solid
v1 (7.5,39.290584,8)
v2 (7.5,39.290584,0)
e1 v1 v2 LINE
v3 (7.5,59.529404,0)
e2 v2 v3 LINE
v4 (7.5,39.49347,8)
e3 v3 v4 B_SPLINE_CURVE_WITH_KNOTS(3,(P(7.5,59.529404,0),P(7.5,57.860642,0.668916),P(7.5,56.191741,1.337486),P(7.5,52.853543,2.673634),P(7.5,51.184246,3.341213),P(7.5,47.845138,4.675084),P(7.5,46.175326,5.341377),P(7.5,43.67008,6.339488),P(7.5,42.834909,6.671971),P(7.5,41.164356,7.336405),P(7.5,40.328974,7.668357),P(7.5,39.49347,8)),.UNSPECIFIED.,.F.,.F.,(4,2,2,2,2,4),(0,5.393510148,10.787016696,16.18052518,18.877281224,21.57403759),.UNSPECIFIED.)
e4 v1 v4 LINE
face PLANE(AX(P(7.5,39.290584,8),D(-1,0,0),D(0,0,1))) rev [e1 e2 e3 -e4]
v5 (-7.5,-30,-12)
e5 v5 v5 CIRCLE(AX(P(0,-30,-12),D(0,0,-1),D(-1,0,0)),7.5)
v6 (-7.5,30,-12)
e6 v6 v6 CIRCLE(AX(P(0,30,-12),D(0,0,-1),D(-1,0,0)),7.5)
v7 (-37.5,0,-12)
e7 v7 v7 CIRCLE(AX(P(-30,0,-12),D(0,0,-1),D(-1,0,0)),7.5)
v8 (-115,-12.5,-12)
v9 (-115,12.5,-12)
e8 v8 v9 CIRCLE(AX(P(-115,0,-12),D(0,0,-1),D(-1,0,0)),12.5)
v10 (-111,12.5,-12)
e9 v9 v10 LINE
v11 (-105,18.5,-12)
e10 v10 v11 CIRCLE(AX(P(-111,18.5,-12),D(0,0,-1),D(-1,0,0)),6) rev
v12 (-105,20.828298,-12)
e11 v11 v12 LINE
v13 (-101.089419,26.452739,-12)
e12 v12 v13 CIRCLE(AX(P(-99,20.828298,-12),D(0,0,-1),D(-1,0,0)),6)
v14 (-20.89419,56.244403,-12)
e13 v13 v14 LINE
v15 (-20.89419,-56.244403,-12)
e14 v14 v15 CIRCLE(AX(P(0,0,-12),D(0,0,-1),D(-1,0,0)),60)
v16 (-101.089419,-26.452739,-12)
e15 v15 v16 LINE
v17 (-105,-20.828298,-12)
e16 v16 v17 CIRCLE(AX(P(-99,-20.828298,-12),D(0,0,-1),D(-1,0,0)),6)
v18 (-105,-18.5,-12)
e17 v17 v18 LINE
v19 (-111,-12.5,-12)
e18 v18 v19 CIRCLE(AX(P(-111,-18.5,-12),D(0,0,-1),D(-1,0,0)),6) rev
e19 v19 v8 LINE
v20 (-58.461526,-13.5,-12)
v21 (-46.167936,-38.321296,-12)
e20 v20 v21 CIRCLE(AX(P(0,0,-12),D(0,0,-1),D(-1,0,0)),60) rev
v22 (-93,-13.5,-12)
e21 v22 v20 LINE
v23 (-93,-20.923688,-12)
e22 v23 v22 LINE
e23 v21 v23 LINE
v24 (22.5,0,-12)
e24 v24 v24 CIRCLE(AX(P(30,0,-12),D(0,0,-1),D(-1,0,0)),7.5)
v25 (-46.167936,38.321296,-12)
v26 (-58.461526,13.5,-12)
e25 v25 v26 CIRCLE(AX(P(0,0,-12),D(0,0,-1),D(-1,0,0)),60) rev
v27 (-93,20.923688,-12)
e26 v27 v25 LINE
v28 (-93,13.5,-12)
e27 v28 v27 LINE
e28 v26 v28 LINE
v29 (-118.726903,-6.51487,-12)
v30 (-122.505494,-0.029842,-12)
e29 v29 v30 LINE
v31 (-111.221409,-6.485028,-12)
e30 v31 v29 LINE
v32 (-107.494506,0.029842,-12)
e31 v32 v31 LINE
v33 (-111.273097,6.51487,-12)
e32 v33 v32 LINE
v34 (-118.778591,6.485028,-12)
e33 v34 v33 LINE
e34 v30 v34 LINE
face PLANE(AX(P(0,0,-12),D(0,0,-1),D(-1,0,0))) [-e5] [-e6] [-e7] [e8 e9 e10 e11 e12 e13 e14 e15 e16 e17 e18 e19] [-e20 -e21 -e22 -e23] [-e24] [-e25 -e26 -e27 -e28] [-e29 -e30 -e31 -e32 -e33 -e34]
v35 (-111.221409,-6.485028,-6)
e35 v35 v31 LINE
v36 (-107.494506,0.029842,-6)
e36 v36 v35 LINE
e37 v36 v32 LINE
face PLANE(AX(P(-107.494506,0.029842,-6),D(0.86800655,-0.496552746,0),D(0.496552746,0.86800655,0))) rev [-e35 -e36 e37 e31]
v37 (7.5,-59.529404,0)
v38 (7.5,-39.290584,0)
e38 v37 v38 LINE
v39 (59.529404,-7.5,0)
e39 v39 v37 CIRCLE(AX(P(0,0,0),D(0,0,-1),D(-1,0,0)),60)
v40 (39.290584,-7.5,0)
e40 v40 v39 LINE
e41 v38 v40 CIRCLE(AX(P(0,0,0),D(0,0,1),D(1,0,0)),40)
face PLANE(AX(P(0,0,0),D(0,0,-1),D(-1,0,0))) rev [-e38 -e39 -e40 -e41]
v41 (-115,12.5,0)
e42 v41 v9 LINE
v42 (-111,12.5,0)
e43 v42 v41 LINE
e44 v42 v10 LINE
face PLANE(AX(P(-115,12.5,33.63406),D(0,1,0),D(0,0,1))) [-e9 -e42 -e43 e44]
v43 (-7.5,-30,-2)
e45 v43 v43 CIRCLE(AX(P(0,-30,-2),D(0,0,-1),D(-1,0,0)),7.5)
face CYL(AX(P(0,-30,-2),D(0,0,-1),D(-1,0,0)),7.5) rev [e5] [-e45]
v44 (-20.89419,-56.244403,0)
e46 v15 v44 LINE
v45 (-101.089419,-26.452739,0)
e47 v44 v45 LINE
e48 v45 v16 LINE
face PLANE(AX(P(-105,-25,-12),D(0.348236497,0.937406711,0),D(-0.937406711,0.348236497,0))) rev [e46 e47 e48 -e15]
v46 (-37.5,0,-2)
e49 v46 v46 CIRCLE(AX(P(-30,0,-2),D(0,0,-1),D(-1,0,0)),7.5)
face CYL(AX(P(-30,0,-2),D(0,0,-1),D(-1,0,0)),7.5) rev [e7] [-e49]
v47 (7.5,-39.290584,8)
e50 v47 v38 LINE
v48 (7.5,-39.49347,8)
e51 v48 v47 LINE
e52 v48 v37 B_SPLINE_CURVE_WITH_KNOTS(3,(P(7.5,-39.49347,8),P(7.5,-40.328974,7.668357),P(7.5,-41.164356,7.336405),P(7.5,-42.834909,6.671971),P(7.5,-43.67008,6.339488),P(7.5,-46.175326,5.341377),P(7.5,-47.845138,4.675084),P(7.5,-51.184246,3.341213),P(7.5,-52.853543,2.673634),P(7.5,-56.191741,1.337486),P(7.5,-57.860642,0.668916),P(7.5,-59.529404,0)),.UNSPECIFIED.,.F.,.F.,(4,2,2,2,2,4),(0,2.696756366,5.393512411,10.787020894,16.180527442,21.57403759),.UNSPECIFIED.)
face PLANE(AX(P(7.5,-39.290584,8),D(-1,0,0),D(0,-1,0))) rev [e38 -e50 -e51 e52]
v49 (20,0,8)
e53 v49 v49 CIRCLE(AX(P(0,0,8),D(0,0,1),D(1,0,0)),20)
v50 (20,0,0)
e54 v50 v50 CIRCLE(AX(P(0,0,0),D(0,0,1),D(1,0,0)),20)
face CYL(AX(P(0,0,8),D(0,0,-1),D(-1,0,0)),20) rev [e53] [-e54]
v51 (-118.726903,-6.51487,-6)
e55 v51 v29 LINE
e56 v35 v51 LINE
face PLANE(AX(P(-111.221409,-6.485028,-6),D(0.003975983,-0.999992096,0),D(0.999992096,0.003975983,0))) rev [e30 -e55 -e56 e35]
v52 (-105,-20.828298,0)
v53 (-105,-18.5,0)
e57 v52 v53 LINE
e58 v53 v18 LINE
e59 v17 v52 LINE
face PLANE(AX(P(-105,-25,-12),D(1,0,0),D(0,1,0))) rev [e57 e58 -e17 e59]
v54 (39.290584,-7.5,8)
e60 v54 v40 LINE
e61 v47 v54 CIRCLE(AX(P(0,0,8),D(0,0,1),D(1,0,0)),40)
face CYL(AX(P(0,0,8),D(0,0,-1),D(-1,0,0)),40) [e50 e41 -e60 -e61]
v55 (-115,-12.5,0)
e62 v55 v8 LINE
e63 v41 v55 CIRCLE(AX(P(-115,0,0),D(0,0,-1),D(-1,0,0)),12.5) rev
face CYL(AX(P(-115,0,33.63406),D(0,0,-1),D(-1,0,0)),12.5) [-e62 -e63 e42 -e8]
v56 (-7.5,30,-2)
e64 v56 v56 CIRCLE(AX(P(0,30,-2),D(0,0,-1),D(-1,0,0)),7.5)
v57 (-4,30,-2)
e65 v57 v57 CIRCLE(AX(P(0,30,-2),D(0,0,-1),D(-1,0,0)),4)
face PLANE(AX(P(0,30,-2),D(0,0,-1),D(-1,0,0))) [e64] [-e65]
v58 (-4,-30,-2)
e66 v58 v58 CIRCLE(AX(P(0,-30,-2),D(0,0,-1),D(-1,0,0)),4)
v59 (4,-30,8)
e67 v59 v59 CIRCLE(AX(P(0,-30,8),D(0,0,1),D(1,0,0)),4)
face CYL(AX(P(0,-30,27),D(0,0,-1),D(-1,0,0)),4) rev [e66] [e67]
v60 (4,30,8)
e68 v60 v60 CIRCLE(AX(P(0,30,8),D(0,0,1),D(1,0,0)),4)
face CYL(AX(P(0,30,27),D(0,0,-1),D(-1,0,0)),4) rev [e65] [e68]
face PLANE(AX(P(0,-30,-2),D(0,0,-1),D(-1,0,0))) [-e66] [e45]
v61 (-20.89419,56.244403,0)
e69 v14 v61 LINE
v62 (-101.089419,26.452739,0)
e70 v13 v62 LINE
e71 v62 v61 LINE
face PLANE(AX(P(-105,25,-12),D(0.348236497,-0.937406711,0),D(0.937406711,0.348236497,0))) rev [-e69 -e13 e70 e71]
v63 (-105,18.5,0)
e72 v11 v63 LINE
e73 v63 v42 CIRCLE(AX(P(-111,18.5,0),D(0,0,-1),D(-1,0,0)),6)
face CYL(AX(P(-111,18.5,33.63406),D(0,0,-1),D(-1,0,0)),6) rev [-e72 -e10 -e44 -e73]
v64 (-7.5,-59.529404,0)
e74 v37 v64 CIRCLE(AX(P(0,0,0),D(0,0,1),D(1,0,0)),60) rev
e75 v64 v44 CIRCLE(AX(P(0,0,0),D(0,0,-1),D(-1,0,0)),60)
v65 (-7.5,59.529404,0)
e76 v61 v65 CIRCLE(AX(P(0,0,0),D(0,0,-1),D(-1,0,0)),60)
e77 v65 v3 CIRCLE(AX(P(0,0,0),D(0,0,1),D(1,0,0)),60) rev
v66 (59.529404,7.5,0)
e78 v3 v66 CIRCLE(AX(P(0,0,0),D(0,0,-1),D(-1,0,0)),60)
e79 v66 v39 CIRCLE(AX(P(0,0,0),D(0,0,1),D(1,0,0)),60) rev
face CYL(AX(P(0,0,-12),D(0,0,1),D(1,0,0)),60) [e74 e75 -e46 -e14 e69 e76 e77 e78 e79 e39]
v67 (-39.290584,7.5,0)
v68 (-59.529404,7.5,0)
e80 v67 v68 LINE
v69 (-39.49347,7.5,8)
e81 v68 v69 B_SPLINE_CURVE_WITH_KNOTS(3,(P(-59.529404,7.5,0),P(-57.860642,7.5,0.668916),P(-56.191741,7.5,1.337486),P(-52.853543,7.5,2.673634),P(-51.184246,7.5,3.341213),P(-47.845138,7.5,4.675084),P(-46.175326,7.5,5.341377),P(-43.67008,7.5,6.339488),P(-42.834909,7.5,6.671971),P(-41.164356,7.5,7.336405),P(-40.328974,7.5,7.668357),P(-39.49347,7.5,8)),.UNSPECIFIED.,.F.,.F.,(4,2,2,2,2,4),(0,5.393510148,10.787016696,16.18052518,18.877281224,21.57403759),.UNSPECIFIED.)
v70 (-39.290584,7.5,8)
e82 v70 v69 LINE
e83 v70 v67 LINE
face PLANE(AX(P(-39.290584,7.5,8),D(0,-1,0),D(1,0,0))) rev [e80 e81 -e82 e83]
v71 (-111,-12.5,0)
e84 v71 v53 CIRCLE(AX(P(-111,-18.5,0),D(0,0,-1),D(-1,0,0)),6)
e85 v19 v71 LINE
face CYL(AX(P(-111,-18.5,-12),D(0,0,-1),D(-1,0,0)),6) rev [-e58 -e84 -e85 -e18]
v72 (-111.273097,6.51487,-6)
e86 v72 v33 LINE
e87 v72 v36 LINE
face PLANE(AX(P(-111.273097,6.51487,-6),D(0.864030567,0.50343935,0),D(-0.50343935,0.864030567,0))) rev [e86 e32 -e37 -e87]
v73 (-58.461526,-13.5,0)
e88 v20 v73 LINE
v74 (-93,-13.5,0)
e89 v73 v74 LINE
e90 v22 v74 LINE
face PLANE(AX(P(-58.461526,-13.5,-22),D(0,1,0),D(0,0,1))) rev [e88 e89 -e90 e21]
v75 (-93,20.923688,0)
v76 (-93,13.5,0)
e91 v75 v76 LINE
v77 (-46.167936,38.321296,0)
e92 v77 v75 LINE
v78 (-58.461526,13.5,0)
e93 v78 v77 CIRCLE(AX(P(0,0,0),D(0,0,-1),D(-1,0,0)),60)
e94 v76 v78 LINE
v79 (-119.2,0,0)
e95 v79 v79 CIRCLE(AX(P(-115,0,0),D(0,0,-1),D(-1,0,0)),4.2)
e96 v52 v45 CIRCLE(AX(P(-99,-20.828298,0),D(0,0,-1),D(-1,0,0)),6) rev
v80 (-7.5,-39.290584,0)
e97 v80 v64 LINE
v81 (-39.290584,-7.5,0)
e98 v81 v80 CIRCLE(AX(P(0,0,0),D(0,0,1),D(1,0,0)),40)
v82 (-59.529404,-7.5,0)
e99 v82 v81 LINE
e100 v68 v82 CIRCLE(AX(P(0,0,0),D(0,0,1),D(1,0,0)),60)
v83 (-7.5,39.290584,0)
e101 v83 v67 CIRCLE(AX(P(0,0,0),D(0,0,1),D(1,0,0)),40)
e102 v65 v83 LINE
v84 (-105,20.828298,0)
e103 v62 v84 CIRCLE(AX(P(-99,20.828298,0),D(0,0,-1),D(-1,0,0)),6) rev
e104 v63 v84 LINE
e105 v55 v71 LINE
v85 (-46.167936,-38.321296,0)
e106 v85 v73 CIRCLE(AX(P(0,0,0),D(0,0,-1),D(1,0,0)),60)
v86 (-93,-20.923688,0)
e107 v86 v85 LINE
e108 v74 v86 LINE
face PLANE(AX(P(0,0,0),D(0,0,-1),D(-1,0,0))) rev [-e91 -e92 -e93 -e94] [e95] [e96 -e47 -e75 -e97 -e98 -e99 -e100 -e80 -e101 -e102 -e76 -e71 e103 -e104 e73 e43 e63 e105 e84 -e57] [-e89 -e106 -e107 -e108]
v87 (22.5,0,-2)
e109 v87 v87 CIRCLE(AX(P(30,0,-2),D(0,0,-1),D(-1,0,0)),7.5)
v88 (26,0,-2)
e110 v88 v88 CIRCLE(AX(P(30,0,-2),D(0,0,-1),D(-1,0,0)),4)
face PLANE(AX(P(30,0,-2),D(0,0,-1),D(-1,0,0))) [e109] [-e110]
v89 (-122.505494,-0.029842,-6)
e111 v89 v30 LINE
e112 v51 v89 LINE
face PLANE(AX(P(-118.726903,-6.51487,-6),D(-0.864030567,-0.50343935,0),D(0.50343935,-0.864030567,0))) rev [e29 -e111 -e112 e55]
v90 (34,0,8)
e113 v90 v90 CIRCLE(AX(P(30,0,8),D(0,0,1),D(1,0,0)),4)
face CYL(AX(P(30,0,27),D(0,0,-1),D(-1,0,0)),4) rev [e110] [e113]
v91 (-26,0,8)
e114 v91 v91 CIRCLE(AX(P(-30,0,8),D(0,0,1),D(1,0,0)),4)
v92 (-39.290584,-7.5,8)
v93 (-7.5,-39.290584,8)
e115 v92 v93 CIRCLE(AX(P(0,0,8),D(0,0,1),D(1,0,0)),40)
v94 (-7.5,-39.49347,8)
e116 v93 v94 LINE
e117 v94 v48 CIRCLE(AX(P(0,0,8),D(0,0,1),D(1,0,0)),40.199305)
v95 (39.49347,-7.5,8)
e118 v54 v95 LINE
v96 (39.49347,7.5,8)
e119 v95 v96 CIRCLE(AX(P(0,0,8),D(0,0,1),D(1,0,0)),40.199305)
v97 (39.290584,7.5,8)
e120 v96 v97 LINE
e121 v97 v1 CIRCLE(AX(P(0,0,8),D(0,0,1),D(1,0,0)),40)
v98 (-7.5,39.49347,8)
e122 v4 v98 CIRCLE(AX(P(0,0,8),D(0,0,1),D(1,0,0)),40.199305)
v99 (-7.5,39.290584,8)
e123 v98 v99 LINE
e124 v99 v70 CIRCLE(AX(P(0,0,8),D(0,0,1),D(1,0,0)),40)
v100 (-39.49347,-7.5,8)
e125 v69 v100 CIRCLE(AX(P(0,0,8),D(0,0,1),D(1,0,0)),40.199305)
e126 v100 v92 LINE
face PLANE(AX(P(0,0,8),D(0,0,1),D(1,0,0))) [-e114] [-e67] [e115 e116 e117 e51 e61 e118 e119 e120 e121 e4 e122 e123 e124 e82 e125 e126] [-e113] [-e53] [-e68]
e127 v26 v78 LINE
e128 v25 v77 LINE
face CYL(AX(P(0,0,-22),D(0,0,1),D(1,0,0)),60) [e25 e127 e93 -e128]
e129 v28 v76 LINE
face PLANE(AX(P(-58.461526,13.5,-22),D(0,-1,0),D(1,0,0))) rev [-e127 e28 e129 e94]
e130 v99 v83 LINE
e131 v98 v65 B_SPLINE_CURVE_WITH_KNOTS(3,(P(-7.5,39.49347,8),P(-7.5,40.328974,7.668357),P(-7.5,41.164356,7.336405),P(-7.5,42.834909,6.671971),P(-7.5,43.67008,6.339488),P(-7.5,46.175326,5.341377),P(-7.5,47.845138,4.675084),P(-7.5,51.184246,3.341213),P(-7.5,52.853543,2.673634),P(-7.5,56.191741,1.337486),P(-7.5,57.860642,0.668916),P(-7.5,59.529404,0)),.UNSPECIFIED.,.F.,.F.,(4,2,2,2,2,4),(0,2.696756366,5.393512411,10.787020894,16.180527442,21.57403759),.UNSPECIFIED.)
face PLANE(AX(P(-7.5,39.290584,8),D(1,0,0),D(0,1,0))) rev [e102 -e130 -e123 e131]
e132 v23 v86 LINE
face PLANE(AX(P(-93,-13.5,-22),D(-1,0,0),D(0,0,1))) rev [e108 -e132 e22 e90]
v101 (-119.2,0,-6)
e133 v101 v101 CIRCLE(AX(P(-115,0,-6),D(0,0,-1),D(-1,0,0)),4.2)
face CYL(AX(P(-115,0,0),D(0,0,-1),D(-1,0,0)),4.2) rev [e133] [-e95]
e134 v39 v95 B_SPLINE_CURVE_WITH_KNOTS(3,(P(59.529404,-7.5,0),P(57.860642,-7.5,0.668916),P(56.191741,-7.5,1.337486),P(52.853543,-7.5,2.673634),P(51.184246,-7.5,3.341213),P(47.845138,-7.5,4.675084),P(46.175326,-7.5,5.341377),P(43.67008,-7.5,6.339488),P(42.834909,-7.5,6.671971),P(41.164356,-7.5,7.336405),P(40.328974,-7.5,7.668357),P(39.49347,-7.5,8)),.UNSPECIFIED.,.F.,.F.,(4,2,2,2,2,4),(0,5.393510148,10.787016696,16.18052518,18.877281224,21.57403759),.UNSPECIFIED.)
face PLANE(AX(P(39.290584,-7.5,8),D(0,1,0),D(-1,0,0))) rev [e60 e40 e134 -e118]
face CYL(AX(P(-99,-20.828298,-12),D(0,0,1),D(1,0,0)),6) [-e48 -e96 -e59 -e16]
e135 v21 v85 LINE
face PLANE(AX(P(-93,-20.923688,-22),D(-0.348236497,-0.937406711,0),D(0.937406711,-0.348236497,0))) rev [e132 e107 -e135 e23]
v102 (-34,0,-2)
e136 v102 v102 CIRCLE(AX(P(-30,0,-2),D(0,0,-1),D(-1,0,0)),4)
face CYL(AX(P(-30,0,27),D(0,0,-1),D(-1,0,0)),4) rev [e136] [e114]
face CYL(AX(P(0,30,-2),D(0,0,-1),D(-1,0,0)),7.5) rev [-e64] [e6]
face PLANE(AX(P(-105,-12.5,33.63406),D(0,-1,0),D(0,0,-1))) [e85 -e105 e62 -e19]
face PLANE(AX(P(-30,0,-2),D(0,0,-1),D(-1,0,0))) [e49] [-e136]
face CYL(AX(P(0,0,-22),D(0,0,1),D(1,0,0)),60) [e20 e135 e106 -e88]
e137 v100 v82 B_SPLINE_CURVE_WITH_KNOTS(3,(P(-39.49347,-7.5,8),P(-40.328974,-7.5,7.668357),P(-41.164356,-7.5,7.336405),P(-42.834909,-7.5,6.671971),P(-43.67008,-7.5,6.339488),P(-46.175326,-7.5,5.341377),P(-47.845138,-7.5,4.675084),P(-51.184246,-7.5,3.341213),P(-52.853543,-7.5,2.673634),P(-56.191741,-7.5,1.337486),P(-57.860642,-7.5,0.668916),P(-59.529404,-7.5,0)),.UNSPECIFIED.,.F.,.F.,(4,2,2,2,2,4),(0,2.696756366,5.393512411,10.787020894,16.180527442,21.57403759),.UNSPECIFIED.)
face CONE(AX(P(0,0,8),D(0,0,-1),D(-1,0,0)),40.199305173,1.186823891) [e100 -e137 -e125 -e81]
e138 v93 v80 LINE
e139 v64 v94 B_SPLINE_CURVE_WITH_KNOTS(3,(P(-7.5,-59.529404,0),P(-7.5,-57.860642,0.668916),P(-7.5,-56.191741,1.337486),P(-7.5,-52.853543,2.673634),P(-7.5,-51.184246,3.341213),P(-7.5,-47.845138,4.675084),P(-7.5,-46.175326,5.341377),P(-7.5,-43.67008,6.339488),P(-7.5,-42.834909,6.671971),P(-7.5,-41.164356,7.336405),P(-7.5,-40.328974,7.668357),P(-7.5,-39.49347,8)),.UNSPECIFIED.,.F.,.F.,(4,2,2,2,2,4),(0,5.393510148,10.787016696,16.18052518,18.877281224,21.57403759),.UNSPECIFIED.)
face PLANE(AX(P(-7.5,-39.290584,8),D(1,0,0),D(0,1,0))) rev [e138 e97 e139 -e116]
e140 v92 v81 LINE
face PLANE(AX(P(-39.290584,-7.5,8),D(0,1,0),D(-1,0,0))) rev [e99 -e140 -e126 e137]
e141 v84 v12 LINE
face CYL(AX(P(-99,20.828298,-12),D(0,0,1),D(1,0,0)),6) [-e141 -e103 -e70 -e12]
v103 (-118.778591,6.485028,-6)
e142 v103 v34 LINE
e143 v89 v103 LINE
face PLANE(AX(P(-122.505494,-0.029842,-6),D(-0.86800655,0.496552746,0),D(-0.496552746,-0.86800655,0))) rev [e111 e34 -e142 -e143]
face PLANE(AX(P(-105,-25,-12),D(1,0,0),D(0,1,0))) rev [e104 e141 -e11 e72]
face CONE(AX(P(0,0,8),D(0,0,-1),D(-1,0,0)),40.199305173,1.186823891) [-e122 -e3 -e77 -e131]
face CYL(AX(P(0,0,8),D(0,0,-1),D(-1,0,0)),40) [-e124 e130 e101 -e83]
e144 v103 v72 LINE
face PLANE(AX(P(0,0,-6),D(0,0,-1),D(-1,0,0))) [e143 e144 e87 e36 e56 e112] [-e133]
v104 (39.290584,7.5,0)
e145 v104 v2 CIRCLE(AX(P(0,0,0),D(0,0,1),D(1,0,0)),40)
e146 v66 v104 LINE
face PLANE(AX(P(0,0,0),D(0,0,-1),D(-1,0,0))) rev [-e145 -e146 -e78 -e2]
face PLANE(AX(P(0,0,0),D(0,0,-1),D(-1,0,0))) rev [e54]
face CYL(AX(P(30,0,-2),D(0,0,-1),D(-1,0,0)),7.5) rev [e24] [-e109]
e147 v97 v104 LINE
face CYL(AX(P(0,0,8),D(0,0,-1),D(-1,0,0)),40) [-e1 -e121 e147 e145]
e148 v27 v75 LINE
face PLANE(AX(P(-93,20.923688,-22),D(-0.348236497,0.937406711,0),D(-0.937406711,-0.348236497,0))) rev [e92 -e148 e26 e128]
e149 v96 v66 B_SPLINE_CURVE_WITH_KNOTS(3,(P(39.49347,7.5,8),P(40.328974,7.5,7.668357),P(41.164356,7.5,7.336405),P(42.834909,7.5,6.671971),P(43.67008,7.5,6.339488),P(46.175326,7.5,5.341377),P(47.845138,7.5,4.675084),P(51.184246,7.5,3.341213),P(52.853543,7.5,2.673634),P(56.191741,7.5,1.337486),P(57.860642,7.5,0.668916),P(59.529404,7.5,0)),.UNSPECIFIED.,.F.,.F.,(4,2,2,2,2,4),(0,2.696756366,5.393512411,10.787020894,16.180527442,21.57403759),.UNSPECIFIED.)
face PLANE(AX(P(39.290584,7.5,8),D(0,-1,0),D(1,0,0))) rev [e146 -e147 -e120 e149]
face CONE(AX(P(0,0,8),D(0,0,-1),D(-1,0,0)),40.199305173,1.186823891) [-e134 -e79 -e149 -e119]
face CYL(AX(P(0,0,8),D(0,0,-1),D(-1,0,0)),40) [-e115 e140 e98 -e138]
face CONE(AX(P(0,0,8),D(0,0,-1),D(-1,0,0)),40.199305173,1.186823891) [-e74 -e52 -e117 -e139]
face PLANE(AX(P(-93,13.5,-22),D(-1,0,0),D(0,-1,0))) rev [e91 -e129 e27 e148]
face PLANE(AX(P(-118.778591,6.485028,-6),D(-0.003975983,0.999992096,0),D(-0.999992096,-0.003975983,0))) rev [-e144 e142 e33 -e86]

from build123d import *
from OCP.BRepFilletAPI import BRepFilletAPI_MakeChamfer
from build123d.topology import SkipClean

# Parameters (mm, degrees)
SKETCH2_R           = 40
SKETCH2_R_2         = 20
BOSS_EXTRUDE1_DEPTH = 8
BOSS_EXTRUDE2_DEPTH = 12
SKETCH4_R           = 7.5
CUT_EXTRUDE1_DEPTH  = 10
SKETCH5_R           = 4
CUT_EXTRUDE2_DEPTH  = 29
BOSS_EXTRUDE3_DEPTH = 8
CHAMFER3_SIZE       = 8
CHAMFER3_SIZE_2     = 19.800694827
BOSS_EXTRUDE4_DEPTH = 12
FILLET1_R           = 6
CUT_EXTRUDE3_DEPTH  = 6
SKETCH9_R           = 4.2
CUT_EXTRUDE4_DEPTH  = 6
CUT_EXTRUDE5_START  = -22
CUT_EXTRUDE5_DEPTH  = 22


with BuildPart() as part:
    # Sketch2 → Boss-Extrude1 (new body)
    with BuildSketch(Plane.XY):
        Circle(SKETCH2_R)
        Circle(SKETCH2_R_2, mode=Mode.SUBTRACT)
    extrude(amount=BOSS_EXTRUDE1_DEPTH)

    # Sketch3 → Boss-Extrude2 (add)
    with BuildSketch(Plane(origin=(0, 0, 0), x_dir=(-1, 0, 0), z_dir=(0, 0, -1))):
        with BuildLine():
            Line((105, -25), (105, 25))
            Line((105, 25), (20.894189842, 56.244402662))
            ThreePointArc((20.894189842, 56.244402662), (-60, 0), (20.894189842, -56.244402662))
            Line((20.894189842, -56.244402662), (105, -25))
        make_face()
    extrude(amount=BOSS_EXTRUDE2_DEPTH)

    # Sketch4 → Cut-Extrude1 (cut)
    with BuildSketch(Plane(origin=(0, 0, -12), x_dir=(-1, 0, 0), z_dir=(0, 0, -1))):
        with Locations((0, 30)):
            Circle(SKETCH4_R)
        with Locations((30, 0)):
            Circle(SKETCH4_R)
        with Locations((0, -30)):
            Circle(SKETCH4_R)
        with Locations((-30, 0)):
            Circle(SKETCH4_R)
    extrude(amount=-CUT_EXTRUDE1_DEPTH, mode=Mode.SUBTRACT)

    # Sketch5 → Cut-Extrude2 (cut)
    with BuildSketch(Plane(origin=(0, 0, -2), x_dir=(-1, 0, 0), z_dir=(0, 0, -1))):
        with Locations((30, 0)):
            Circle(SKETCH5_R)
        with Locations((0, -30)):
            Circle(SKETCH5_R)
        with Locations((-30, 0)):
            Circle(SKETCH5_R)
        with Locations((0, 30)):
            Circle(SKETCH5_R)
    extrude(amount=-CUT_EXTRUDE2_DEPTH, mode=Mode.SUBTRACT)

    # Sketch6 → Boss-Extrude3 (add)
    with SkipClean():  # the faces are left unmerged after this step: merging them gives an invalid solid
        with BuildSketch(Plane.XY):
            with BuildLine():
                Line((39.290584114, -7.5), (59.529404499, -7.5))
                ThreePointArc((59.529404499, -7.5), (60, 0), (59.529404499, 7.5))
                Line((59.529404499, 7.5), (39.290584114, 7.5))
                ThreePointArc((39.290584114, 7.5), (40, 0), (39.290584114, -7.5))
            make_face()
            with BuildLine():
                Line((-7.5, 39.290584114), (-7.5, 59.529404499))
                ThreePointArc((-7.5, 59.529404499), (0, 60), (7.5, 59.529404499))
                Line((7.5, 59.529404499), (7.5, 39.290584114))
                ThreePointArc((7.5, 39.290584114), (0, 40), (-7.5, 39.290584114))
            make_face()
            with BuildLine():
                Line((-7.5, -39.290584114), (-7.5, -59.529404499))
                ThreePointArc((-7.5, -59.529404499), (0, -60), (7.5, -59.529404499))
                Line((7.5, -59.529404499), (7.5, -39.290584114))
                ThreePointArc((7.5, -39.290584114), (0, -40), (-7.5, -39.290584114))
            make_face()
            with BuildLine():
                Line((-39.290584114, 7.5), (-59.529404499, 7.5))
                ThreePointArc((-59.529404499, 7.5), (-60, 0), (-59.529404499, -7.5))
                Line((-59.529404499, -7.5), (-39.290584114, -7.5))
                ThreePointArc((-39.290584114, -7.5), (-40, 0), (-39.290584114, 7.5))
            make_face()
        extrude(amount=BOSS_EXTRUDE3_DEPTH)

    # Chamfer3
    chamfer3_edges_1 = [part.edges().sort_by_distance(p)[0] for p in [
        (0, 60, 8),
    ]]
    chamfer3_side_1 = [part.faces().sort_by_distance(p)[0] for p in [
        (0, 60, 7.84),
    ]]
    chamfer3_edges_2 = [part.edges().sort_by_distance(p)[0] for p in [
        (60, 0, 8),
    ]]
    chamfer3_side_2 = [part.faces().sort_by_distance(p)[0] for p in [
        (60, 0, 7.84),
    ]]
    chamfer3_edges_3 = [part.edges().sort_by_distance(p)[0] for p in [
        (-60, 0, 8),
    ]]
    chamfer3_side_3 = [part.faces().sort_by_distance(p)[0] for p in [
        (-60, 0, 7.84),
    ]]
    chamfer3_edges_4 = [part.edges().sort_by_distance(p)[0] for p in [
        (0, -60, 8),
    ]]
    chamfer3_side_4 = [part.faces().sort_by_distance(p)[0] for p in [
        (0, -60, 7.84),
    ]]
    chamfer3 = BRepFilletAPI_MakeChamfer(part.part.solid().wrapped)
    for e in chamfer3_edges_1:
        chamfer3.Add(CHAMFER3_SIZE - 0.0001, CHAMFER3_SIZE_2 - 0.0001, e.wrapped, chamfer3_side_1[0].wrapped)
    for e in chamfer3_edges_2:
        chamfer3.Add(CHAMFER3_SIZE - 0.0001, CHAMFER3_SIZE_2 - 0.0001, e.wrapped, chamfer3_side_2[0].wrapped)
    for e in chamfer3_edges_3:
        chamfer3.Add(CHAMFER3_SIZE - 0.0001, CHAMFER3_SIZE_2 - 0.0001, e.wrapped, chamfer3_side_3[0].wrapped)
    for e in chamfer3_edges_4:
        chamfer3.Add(CHAMFER3_SIZE - 0.0001, CHAMFER3_SIZE_2 - 0.0001, e.wrapped, chamfer3_side_4[0].wrapped)
    add(Compound.cast(chamfer3.Shape()), mode=Mode.REPLACE)  # a hair under: the kernel refuses the full size

    # Sketch7 → Boss-Extrude4 (add)
    with BuildSketch(Plane(origin=(0, 0, -12), x_dir=(-1, 0, 0), z_dir=(0, 0, -1))):
        with BuildLine():
            Line((115, 12.5), (105, 12.5))
            Line((105, 12.5), (105, -12.5))
            Line((105, -12.5), (115, -12.5))
            ThreePointArc((115, -12.5), (127.5, 0), (115, 12.5))
        make_face()
    extrude(amount=-BOSS_EXTRUDE4_DEPTH)

    # Fillet1
    fillet1_edges = [part.edges().sort_by_distance(p)[0] for p in [
        (-105, -25, -6),
        (-105, 25, -6),
        (-105, -12.5, -6),
        (-105, 12.5, -6),
    ]]
    fillet(fillet1_edges, radius=FILLET1_R)

    # Sketch8 → Cut-Extrude3 (cut)
    with SkipClean():  # the faces are left unmerged after this step: merging them gives an invalid solid
        with BuildSketch(Plane(origin=(0, 0, -12), x_dir=(-1, 0, 0), z_dir=(0, 0, -1))):
            Polygon((118.778590974, 6.485027647), (111.2730968, 6.514869597), (107.494505826, 0.02984195), (111.221409026, -6.485027647), (118.7269032, -6.514869597), (122.505494174, -0.02984195), align=None)
        extrude(amount=-CUT_EXTRUDE3_DEPTH, mode=Mode.SUBTRACT)

    # Sketch9 → Cut-Extrude4 (cut)
    with SkipClean():  # the faces are left unmerged after this step: merging them gives an invalid solid
        with BuildSketch(Plane(origin=(0, 0, -6), x_dir=(-1, 0, 0), z_dir=(0, 0, -1))):
            with Locations((115, 0)):
                Circle(SKETCH9_R)
        extrude(amount=-CUT_EXTRUDE4_DEPTH, mode=Mode.SUBTRACT)

    # Sketch10 → Cut-Extrude5 (cut)
    with SkipClean():  # the faces are left unmerged after this step: merging them gives an invalid solid
        with BuildSketch(Plane.XY.offset(CUT_EXTRUDE5_START)):
            with BuildLine():
                Line((-58.46152581, -13.5), (-93, -13.5))
                Line((-93, -13.5), (-93, -20.923688206))
                Line((-93, -20.923688206), (-46.167935821, -38.321295672))
                ThreePointArc((-46.167935821, -38.321295672), (-53.766674065, -26.62977206), (-58.46152581, -13.5))
            make_face()
            with BuildLine():
                Line((-93, 20.923688206), (-46.167935821, 38.321295672))
                ThreePointArc((-46.167935821, 38.321295672), (-53.766674065, 26.62977206), (-58.46152581, 13.5))
                Line((-58.46152581, 13.5), (-93, 13.5))
                Line((-93, 13.5), (-93, 20.923688206))
            make_face()
        extrude(amount=CUT_EXTRUDE5_DEPTH, mode=Mode.SUBTRACT)


solid = part.part
